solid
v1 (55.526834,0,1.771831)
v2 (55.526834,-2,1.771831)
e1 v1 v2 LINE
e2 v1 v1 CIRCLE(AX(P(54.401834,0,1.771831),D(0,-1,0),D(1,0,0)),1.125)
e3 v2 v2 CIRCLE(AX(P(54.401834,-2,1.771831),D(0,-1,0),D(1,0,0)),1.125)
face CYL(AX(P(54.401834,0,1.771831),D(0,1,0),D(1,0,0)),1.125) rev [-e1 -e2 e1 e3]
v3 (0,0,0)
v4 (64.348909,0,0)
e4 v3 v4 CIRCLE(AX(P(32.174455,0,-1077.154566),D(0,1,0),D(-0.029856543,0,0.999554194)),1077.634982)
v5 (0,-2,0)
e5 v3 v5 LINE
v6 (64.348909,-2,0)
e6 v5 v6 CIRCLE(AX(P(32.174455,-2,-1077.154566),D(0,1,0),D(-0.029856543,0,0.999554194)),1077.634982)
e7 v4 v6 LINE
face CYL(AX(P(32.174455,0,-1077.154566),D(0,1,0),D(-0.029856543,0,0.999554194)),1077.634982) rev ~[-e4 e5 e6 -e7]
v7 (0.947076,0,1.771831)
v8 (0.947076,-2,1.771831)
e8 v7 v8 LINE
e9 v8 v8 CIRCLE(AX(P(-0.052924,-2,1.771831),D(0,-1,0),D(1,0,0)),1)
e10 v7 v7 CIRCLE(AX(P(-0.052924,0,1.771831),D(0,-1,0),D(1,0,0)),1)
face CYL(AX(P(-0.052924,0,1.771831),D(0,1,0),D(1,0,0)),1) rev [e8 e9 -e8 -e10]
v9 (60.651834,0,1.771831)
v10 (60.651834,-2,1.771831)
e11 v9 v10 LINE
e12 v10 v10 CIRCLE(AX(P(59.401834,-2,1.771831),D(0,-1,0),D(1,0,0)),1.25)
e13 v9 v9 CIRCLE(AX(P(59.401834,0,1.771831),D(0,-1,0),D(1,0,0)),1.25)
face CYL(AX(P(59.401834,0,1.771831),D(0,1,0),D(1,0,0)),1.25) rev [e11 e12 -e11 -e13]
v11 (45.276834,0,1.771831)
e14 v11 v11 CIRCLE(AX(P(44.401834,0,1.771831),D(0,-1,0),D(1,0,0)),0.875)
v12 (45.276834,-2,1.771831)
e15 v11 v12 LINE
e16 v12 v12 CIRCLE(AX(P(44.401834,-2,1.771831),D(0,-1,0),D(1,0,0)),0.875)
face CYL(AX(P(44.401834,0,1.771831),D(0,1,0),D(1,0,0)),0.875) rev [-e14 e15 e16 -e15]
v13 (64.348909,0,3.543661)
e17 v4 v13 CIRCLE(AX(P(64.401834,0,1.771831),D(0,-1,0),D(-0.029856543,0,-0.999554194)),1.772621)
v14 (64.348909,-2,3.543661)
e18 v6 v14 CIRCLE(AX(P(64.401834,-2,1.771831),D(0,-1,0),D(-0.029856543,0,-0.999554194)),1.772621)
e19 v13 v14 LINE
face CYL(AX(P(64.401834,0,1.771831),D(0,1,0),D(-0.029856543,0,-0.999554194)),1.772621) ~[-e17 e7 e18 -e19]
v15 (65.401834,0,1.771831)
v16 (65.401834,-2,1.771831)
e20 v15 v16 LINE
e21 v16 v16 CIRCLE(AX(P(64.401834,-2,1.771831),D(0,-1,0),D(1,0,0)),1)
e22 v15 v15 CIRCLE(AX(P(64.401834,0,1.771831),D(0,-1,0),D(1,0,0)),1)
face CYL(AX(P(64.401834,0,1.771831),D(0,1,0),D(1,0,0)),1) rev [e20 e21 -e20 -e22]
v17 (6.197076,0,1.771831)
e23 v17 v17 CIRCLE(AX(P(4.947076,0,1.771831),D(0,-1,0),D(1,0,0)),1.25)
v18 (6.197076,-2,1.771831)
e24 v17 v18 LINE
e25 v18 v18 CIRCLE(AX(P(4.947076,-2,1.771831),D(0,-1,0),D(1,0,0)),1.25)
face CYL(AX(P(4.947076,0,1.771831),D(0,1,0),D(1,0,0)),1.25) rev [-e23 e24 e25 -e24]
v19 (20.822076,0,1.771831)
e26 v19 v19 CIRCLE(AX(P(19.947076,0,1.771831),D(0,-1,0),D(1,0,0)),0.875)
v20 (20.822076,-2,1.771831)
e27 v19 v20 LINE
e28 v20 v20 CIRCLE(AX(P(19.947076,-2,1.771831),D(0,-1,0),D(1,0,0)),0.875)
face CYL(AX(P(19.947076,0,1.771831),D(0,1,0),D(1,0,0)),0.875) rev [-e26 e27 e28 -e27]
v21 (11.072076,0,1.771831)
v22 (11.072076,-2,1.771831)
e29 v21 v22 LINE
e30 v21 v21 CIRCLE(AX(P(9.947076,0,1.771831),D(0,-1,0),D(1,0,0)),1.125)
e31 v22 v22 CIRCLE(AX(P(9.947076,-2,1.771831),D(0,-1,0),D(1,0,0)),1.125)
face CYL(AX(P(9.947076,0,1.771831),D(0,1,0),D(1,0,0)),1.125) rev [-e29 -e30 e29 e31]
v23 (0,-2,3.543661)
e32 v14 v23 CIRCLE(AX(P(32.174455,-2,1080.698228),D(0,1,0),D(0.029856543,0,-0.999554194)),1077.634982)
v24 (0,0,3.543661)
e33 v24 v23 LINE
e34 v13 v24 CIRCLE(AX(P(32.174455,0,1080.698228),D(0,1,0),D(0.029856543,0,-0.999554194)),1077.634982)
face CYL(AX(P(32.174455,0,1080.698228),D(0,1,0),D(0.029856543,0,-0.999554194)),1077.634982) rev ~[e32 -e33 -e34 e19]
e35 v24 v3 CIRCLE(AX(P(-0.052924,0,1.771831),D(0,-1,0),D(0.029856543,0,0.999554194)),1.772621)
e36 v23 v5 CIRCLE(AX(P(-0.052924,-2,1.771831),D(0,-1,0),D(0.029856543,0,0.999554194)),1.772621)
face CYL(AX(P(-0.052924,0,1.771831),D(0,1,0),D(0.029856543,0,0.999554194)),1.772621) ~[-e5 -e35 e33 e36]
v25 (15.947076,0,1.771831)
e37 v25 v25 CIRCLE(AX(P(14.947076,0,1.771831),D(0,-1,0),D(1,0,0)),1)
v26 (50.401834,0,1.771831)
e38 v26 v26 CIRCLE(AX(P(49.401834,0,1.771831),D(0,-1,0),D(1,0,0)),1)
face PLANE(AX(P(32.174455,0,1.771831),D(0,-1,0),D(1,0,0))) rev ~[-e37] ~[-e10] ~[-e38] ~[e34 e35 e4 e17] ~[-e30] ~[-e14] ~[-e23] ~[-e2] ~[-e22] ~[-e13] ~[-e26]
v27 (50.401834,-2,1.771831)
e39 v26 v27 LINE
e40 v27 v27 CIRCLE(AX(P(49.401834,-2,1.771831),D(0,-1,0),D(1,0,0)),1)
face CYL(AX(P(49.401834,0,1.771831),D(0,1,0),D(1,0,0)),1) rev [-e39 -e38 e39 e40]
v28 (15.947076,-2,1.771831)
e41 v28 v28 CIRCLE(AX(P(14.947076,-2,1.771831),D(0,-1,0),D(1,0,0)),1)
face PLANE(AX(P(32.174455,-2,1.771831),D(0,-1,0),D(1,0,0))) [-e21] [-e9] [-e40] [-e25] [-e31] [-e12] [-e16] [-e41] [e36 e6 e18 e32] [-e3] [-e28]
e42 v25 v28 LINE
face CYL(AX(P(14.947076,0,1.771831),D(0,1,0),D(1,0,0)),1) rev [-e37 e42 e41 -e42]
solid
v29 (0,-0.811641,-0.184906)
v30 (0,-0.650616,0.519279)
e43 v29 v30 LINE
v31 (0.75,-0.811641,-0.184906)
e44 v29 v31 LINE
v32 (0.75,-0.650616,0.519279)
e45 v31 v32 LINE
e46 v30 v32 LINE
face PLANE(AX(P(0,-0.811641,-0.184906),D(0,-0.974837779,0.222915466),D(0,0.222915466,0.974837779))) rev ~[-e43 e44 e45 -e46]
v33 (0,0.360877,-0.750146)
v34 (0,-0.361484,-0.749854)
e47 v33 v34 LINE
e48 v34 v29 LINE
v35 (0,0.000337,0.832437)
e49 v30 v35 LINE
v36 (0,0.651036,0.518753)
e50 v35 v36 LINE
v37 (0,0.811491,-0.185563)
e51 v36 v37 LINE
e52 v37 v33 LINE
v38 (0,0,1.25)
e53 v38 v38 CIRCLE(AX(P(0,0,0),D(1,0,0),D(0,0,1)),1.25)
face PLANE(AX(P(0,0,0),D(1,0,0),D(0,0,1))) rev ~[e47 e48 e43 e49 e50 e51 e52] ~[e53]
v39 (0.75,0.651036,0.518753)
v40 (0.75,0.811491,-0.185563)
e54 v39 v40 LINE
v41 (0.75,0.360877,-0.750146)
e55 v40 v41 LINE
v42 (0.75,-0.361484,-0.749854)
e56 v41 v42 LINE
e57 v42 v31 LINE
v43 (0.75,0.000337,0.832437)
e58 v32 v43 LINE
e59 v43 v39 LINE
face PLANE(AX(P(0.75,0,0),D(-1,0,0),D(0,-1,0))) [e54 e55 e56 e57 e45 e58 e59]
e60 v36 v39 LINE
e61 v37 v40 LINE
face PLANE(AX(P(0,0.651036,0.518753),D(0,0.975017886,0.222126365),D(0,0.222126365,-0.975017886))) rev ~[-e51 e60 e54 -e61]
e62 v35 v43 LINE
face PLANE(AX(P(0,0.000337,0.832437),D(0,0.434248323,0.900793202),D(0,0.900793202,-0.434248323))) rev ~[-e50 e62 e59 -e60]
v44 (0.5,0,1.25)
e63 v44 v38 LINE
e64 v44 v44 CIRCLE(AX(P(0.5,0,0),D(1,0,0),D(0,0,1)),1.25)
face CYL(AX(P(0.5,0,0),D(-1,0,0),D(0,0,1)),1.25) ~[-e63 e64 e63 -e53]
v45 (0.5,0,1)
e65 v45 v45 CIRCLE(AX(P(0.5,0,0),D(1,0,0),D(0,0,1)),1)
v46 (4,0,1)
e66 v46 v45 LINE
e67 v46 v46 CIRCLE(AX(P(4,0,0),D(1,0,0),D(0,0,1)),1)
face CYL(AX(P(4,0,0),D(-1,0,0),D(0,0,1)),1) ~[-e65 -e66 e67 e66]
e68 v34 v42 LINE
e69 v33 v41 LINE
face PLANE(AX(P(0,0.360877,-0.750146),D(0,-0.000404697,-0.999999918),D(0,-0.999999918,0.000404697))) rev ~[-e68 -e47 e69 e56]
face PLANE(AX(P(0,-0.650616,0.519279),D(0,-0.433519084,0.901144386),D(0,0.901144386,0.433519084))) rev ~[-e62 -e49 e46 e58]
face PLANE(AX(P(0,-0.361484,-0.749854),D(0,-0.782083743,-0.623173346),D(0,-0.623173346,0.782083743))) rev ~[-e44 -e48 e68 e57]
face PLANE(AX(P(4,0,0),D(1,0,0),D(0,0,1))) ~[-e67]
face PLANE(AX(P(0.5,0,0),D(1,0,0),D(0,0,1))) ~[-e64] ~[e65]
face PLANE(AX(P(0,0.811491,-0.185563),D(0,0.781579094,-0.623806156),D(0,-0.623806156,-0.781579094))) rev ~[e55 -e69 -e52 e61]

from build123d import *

# Parameters (mm, degrees)
F0_R     = 1
F0_R_2   = 1.25
F0_R_3   = 1.125
F0_R_4   = 0.875
F1_DEPTH = 2
F5_DEPTH = 0.75


with BuildPart() as f1:
    # F0 (on Front) → F1 (new body)
    with BuildSketch(Plane.XZ):
        with BuildLine():
            ThreePointArc((64.3489094749, 3.5436613707), (32.1744547374, 3.0632452956), (0, 3.5436613707))
            ThreePointArc((0, 3.5436613707), (-1.8255452626, 1.7718306853), (0, 0))
            ThreePointArc((0, 0), (32.1744547374, 0.4804160751), (64.3489094749, 0))
            ThreePointArc((64.3489094749, 0), (66.1744547374, 1.7718306853), (64.3489094749, 3.5436613707))
        make_face()
        with Locations((-0.0529243323, 1.7718306853)):
            Circle(F0_R, mode=Mode.SUBTRACT)
        with Locations((4.9470756677, 1.7718306853)):
            Circle(F0_R_2, mode=Mode.SUBTRACT)
        with Locations((9.9470756677, 1.7718306853)):
            Circle(F0_R_3, mode=Mode.SUBTRACT)
        with Locations((14.9470756677, 1.7718306853)):
            Circle(F0_R, mode=Mode.SUBTRACT)
        with Locations((19.9470756677, 1.7718306853)):
            Circle(F0_R_4, mode=Mode.SUBTRACT)
        with Locations((44.4018338072, 1.7718306853)):
            Circle(F0_R_4, mode=Mode.SUBTRACT)
        with Locations((49.4018338072, 1.7718306853)):
            Circle(F0_R, mode=Mode.SUBTRACT)
        with Locations((54.4018338072, 1.7718306853)):
            Circle(F0_R_3, mode=Mode.SUBTRACT)
        with Locations((59.4018338072, 1.7718306853)):
            Circle(F0_R_2, mode=Mode.SUBTRACT)
        with Locations((64.4018338072, 1.7718306853)):
            Circle(F0_R, mode=Mode.SUBTRACT)
    extrude(amount=F1_DEPTH)


with BuildPart() as f3:
    # F2 (on Front) → F3 (revolve)
    with BuildSketch(Plane.XZ):
        Polygon((0, 1.25), (0, 0), (4, 0), (4, 1), (0.5, 1), (0.5, 1.25), align=None)
    revolve(axis=Axis((1.7442880877, 0, 0), (1, 0, 0)))

    # F4 (on face) → F5 (cut)
    with BuildSketch(Plane(origin=(0, 0, 0), x_dir=(0, -1, 0), z_dir=(-1, 0, 0))):
        Polygon((0.3614844576, -0.7498537696), (0.8116411571, -0.1849062488), (0.6506155109, 0.5192794487), (-0.0003368852, 0.83243713), (-0.6510355999, 0.5187526738), (-0.8114912291, -0.1855631264), (-0.3608774115, -0.7501461076), align=None)
    extrude(amount=-F5_DEPTH, mode=Mode.SUBTRACT)


solid = Compound([f1.part, f3.part])
